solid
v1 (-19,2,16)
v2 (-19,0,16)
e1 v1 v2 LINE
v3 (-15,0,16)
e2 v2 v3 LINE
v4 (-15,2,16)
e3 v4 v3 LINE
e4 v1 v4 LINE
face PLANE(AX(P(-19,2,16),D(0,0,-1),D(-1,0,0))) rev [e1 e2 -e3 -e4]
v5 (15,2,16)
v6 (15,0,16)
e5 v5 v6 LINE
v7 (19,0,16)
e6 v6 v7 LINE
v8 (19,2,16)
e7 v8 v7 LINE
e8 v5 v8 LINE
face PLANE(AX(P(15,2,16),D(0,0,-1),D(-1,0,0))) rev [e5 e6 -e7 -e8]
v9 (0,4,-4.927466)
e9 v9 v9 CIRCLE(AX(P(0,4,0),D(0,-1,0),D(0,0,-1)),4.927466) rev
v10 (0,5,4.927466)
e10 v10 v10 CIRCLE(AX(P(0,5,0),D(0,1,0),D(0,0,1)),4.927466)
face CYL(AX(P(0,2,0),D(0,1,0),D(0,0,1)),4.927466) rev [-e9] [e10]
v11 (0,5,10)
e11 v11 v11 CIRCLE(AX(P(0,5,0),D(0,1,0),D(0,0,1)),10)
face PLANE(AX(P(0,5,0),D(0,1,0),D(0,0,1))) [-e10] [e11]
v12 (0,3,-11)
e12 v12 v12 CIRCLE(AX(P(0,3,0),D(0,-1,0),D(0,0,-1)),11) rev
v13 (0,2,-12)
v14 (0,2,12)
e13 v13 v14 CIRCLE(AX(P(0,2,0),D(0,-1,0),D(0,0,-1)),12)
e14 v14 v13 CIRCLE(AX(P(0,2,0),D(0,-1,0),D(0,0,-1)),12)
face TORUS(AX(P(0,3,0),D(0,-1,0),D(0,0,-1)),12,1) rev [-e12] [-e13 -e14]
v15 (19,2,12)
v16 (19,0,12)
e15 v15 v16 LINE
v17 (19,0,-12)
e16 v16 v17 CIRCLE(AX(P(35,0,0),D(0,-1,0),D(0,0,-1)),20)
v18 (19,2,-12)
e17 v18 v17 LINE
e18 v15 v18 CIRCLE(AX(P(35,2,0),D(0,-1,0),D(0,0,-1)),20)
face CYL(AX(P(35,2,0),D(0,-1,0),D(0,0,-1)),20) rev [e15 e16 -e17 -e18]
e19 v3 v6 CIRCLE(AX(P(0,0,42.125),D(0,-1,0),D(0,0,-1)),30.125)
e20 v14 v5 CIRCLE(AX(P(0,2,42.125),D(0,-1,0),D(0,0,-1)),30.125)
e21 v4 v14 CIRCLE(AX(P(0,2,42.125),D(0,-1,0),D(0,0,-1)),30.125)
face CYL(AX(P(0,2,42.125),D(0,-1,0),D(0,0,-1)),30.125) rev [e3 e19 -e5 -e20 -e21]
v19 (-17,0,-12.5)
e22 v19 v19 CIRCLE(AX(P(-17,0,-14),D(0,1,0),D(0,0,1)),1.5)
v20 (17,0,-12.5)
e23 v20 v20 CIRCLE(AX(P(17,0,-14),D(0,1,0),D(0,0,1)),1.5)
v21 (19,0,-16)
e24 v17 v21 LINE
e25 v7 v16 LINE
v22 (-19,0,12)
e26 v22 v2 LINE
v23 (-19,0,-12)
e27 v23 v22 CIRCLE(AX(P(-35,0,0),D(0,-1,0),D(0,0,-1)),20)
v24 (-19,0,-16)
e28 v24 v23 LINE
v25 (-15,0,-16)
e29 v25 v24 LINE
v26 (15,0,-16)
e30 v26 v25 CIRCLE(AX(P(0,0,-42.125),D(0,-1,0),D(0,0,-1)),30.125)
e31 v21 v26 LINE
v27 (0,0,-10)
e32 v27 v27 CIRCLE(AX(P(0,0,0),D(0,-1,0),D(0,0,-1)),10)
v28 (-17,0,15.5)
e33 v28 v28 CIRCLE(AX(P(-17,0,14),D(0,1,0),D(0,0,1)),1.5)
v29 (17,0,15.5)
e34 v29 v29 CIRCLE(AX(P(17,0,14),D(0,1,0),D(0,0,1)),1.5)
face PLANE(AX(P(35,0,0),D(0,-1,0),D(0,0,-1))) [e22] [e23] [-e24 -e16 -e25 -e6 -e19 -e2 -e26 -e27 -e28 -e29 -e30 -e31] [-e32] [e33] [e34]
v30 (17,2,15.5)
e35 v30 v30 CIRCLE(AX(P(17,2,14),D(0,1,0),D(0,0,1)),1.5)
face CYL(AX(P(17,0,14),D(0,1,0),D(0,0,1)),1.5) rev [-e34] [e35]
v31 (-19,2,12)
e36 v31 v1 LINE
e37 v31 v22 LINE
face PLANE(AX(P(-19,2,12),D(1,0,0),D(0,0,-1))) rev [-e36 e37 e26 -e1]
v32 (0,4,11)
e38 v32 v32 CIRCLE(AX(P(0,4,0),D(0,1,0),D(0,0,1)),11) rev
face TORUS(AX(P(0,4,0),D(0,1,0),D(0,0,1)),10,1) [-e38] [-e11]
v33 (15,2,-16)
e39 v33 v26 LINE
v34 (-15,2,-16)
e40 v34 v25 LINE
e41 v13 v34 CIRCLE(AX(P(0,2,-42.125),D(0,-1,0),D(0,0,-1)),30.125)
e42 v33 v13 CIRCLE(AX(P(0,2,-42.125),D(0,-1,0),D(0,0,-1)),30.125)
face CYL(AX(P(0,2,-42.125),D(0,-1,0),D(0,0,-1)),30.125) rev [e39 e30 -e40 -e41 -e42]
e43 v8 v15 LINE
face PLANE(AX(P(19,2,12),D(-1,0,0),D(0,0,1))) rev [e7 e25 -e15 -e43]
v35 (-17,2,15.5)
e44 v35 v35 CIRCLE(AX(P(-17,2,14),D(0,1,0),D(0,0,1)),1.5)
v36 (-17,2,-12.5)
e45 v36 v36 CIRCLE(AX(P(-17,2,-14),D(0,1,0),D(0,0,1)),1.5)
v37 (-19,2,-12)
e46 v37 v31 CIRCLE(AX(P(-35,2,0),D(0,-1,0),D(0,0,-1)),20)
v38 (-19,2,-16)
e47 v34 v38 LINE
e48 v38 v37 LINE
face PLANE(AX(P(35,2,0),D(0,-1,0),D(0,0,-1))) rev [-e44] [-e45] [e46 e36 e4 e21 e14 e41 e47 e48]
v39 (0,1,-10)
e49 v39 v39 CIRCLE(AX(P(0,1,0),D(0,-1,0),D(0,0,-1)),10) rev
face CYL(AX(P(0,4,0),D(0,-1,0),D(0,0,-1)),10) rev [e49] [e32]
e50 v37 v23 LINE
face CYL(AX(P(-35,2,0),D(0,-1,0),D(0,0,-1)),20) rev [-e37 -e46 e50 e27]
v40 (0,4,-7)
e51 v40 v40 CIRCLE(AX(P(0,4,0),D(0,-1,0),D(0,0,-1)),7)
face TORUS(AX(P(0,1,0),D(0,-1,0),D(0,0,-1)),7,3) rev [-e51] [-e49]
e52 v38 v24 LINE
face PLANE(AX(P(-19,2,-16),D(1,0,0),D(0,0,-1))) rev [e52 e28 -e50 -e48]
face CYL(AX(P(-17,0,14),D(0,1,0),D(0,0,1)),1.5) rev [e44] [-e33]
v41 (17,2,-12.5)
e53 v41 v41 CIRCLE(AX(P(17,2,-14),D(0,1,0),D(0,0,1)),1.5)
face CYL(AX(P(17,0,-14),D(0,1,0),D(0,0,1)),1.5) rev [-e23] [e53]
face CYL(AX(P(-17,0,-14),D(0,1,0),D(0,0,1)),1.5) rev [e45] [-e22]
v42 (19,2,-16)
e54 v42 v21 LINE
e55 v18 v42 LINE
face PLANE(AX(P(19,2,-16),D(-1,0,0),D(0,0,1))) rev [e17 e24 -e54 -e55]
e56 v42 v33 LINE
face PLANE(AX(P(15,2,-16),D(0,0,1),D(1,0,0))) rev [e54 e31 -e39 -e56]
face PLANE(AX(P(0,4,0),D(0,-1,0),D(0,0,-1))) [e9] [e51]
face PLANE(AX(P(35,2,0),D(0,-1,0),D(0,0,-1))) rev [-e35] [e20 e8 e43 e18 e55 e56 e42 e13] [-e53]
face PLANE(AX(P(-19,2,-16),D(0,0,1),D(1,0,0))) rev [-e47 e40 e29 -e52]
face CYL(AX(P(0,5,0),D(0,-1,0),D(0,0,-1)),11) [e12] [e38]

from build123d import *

# Parameters (mm, degrees)
SALIENTE_EXTRUIR2_DEPTH = 2
CROQUIS3_R              = 1.5000000000000002
CROQUIS3_R_2            = 1.5000000000000009
CORTAR_EXTRUIR1_DEPTH   = 2
CROQUIS4_R              = 11
SALIENTE_EXTRUIR3_DEPTH = 3
REDONDEO1_R             = 1
REDONDEO2_R             = 1
CROQUIS6_R              = 4.927466062817137
CORTAR_EXTRUIR2_DEPTH   = 3
CROQUIS7_R              = 10
CORTAR_EXTRUIR3_DEPTH   = 4
REDONDEO3_R             = 3


with BuildPart() as part:
    # Croquis2 → Saliente-Extruir2 (new body)
    with BuildSketch(Plane(origin=(0, 0, 0), x_dir=(1, 0, 0), z_dir=(0, 1, 0))):
        with BuildLine():
            Line((-19.000000000000007, -12), (-19, -16))
            Line((-19, -16), (-15, -16))
            ThreePointArc((-15, -16), (1.84e-15, -12.000000000000014), (15, -16))
            Line((15, -16), (19, -16))
            Line((19, -16), (19, -12))
            ThreePointArc((19, -12), (15.000000000000014, -2.45e-15), (19, 12))
            Line((19, 12), (19, 16))
            Line((19, 16), (15, 16))
            ThreePointArc((15, 16), (1.84e-15, 12.000000000000014), (-15, 16))
            Line((-15, 16), (-19, 16))
            Line((-19, 16), (-19.000000000000007, 12))
            ThreePointArc((-19.000000000000007, 12), (-15.000000000000007, 0), (-19.000000000000007, -12))
        make_face()
    extrude(amount=SALIENTE_EXTRUIR2_DEPTH)

    # Croquis3 → Cortar-Extruir1 (cut)
    with BuildSketch(Plane(origin=(0, 2, 0), x_dir=(1, 0, 0), z_dir=(0, 1, 0))):
        with Locations((-17, 13.999999999999998)):
            Circle(CROQUIS3_R)
        with Locations((17, 14.000000000000002)):
            Circle(CROQUIS3_R_2)
        with Locations((17.000000000000004, -14.000000000000002)):
            Circle(CROQUIS3_R_2)
        with Locations((-17, -14.000000000000002)):
            Circle(CROQUIS3_R)
    extrude(amount=-CORTAR_EXTRUIR1_DEPTH, mode=Mode.SUBTRACT)

    # Croquis4 → Saliente-Extruir3 (add)
    with BuildSketch(Plane(origin=(0, 2, 0), x_dir=(1, 0, 0), z_dir=(0, 1, 0))):
        Circle(CROQUIS4_R)
    extrude(amount=SALIENTE_EXTRUIR3_DEPTH)

    # Redondeo1
    redondeo1_edges = [part.edges().sort_by_distance(p)[0] for p in [
        (-11, 5, -6.23e-15),
    ]]
    fillet(redondeo1_edges, radius=REDONDEO1_R)

    # Redondeo2
    redondeo2_edges = [part.edges().sort_by_distance(p)[0] for p in [
        (-11, 2, -6.23e-15),
    ]]
    fillet(redondeo2_edges, radius=REDONDEO2_R)

    # Croquis6 → Cortar-Extruir2 (cut)
    with BuildSketch(Plane(origin=(0, 5, 0), x_dir=(1, 0, 0), z_dir=(0, 1, 0))):
        Circle(CROQUIS6_R)
    extrude(amount=-CORTAR_EXTRUIR2_DEPTH, mode=Mode.SUBTRACT)

    # Croquis7 → Cortar-Extruir3 (cut)
    with BuildSketch(Plane.XZ):
        Circle(CROQUIS7_R)
    extrude(amount=-CORTAR_EXTRUIR3_DEPTH, mode=Mode.SUBTRACT)

    # Redondeo3
    redondeo3_edges = [part.edges().sort_by_distance(p)[0] for p in [
        (-10, 4, 1.22e-15),
    ]]
    fillet(redondeo3_edges, radius=REDONDEO3_R)


solid = part.part
